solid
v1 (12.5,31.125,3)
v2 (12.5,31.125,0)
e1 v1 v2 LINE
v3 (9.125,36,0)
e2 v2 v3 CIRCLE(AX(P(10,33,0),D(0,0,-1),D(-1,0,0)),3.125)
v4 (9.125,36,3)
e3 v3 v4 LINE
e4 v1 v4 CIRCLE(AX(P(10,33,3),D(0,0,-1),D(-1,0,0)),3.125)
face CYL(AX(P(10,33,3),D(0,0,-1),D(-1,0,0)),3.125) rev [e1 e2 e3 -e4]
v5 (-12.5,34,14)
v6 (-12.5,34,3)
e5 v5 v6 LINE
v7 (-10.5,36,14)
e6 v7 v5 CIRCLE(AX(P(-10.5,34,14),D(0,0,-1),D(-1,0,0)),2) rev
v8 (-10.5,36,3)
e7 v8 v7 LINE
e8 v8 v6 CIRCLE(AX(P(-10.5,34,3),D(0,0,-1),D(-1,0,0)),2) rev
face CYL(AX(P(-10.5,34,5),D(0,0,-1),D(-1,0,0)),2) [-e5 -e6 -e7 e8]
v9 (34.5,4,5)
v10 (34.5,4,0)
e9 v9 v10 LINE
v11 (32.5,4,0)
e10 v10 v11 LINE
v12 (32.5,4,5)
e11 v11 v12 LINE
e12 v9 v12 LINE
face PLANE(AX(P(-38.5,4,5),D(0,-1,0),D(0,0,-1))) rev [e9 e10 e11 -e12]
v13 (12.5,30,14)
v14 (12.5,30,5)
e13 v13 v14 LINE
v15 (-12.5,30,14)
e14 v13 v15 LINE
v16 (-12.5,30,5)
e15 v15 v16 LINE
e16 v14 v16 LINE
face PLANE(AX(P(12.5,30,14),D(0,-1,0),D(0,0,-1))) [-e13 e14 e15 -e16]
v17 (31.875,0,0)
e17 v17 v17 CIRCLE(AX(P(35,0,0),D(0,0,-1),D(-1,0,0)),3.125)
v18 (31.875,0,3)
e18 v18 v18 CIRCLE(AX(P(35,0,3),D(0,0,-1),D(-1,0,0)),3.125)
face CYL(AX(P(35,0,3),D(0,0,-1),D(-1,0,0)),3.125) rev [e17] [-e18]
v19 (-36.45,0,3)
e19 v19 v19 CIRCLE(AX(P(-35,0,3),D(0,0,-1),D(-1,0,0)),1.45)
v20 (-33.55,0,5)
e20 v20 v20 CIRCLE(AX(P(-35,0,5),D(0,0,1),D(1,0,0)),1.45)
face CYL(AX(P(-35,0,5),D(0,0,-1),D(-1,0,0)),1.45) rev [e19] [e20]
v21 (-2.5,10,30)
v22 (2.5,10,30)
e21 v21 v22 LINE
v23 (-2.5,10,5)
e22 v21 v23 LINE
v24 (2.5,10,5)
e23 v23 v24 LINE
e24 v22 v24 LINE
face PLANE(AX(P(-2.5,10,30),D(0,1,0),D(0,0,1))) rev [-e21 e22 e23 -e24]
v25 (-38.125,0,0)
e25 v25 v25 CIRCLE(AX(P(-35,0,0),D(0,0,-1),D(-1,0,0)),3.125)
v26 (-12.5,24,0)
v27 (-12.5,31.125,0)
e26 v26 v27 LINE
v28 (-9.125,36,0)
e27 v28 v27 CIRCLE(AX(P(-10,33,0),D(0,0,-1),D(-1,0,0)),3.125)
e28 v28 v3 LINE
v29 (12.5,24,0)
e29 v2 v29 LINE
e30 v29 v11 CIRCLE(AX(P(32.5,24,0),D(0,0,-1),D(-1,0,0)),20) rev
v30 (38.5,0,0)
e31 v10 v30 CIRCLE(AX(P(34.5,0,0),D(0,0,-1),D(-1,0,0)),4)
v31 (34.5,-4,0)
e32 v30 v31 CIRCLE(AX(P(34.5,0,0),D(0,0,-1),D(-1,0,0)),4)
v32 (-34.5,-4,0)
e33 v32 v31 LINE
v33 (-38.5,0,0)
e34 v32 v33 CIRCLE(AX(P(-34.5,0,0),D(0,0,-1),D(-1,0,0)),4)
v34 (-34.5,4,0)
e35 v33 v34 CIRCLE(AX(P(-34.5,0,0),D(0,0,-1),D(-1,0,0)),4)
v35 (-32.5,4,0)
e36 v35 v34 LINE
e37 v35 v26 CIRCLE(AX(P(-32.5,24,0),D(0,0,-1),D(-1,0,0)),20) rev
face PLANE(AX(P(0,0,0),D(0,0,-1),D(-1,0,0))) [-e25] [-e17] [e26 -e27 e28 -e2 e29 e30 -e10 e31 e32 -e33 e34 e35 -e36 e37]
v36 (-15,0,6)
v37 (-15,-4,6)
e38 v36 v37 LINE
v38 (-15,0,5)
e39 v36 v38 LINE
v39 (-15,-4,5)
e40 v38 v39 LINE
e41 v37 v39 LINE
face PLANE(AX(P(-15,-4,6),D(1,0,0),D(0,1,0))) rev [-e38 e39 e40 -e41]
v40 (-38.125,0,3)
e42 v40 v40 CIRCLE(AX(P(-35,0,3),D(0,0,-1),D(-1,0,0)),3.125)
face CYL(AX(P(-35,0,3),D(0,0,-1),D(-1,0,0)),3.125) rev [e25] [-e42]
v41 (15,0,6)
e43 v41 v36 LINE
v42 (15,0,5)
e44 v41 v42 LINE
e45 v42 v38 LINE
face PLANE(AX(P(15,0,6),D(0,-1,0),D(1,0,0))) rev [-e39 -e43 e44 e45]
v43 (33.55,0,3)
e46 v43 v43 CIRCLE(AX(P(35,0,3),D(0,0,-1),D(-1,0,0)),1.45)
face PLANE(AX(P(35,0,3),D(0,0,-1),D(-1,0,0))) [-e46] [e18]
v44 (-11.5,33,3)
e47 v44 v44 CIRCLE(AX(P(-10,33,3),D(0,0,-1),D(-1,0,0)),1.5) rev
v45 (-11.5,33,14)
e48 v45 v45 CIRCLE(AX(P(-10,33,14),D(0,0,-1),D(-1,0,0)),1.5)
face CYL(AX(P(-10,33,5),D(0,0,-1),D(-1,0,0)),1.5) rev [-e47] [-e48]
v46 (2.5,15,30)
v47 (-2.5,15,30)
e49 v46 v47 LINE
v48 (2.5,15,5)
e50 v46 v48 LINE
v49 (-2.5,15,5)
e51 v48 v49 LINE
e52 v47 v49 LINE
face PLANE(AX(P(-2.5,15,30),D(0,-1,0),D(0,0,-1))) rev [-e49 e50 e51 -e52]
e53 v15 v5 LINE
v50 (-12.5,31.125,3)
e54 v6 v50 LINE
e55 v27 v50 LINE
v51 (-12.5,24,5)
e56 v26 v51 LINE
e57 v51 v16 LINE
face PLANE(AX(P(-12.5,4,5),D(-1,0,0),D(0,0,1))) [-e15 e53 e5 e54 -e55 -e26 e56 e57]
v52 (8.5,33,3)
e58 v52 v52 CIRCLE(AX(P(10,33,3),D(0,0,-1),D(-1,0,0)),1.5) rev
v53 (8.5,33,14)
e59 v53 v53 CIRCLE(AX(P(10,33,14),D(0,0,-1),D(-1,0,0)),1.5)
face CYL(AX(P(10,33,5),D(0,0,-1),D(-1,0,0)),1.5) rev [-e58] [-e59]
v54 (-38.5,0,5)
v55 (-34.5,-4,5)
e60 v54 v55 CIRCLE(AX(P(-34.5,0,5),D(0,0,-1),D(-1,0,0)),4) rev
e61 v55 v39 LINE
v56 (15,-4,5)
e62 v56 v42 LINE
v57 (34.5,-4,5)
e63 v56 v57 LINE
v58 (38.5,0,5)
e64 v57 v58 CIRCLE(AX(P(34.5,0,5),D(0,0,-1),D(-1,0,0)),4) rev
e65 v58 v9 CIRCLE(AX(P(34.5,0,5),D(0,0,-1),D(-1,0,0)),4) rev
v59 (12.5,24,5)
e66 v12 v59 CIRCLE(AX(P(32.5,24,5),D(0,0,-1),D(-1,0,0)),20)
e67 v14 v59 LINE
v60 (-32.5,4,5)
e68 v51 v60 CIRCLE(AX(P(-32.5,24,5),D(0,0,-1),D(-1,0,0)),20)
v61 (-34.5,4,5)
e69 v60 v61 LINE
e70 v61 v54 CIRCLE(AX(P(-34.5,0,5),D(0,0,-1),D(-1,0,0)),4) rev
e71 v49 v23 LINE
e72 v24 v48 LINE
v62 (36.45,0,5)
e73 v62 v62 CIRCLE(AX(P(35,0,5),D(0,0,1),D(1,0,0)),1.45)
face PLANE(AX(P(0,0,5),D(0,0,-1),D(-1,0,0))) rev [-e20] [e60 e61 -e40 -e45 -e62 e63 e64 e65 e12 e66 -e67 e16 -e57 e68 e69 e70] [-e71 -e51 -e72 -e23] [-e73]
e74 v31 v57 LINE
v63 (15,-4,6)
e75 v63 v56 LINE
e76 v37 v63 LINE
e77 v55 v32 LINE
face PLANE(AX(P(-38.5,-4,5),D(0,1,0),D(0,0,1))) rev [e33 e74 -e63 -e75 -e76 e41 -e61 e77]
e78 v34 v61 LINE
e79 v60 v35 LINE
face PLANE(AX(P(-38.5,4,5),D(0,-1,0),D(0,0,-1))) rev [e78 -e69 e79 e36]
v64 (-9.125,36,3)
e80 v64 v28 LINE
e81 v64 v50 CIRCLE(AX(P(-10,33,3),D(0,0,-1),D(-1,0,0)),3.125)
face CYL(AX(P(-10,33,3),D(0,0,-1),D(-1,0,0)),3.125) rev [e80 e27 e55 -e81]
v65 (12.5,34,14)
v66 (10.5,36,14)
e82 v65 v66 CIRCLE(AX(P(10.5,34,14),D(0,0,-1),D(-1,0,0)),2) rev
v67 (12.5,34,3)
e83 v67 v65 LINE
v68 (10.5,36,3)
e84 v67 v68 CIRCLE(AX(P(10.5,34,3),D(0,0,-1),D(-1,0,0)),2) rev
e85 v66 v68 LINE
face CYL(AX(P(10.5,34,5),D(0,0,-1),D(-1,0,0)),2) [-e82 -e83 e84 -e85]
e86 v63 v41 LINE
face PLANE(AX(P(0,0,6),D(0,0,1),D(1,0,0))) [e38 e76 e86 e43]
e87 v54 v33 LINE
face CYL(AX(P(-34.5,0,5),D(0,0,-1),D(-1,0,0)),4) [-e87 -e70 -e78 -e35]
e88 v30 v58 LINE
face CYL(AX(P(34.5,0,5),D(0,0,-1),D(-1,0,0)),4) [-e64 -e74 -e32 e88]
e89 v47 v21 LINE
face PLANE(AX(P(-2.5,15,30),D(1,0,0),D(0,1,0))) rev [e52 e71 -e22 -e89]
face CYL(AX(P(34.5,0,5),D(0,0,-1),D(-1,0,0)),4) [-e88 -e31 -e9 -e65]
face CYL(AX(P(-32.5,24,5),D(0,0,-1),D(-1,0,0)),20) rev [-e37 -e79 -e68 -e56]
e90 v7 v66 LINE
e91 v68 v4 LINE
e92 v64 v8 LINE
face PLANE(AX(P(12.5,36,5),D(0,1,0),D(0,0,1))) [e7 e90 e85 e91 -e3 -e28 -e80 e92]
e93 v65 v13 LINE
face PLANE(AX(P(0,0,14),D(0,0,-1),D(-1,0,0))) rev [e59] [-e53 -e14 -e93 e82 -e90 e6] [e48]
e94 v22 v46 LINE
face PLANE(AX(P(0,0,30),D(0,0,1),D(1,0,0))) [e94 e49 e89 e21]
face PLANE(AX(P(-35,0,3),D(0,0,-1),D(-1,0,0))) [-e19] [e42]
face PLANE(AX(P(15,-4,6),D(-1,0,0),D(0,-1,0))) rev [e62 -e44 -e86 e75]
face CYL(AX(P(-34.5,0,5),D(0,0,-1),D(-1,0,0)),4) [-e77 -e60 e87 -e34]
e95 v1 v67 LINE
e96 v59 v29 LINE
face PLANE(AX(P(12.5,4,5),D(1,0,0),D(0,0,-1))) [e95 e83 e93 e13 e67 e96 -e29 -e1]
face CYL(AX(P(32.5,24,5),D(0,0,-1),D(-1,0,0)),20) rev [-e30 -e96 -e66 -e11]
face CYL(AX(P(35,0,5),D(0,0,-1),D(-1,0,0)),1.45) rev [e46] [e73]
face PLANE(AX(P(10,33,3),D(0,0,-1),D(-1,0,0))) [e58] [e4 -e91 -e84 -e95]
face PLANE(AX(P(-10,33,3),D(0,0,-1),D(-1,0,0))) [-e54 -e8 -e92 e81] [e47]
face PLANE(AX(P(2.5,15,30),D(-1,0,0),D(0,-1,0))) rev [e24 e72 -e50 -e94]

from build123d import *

# Parameters (mm, degrees)
SKETCH_1_W          = 77
SKETCH_1_H          = 8
SKETCH_1_R          = 1.45
EXTRUDE_1_DEPTH     = 5
SKETCH_2_W          = 25
SKETCH_2_H          = 32
SKETCH_2_R          = 1.5
EXTRUDE_2_DEPTH     = 5
SKETCH_3_W          = 25
SKETCH_3_H          = 6
SKETCH_3_R          = 1.5
EXTRUDE_3_DEPTH     = 9
FILLET_1_R          = 20
FILLET_2_R          = 4
FILLET_3_R          = 2
SKETCH_4_R          = 3.125
CUT_EXTRUDE_3_DEPTH = 3
SKETCH_5_W          = 30
SKETCH_5_H          = 4
EXTRUDE_4_DEPTH     = 1
SKETCH_6_W          = 5
SKETCH_6_H          = 5
EXTRUDE_5_DEPTH     = 25


with BuildPart() as part:
    # Эскиз1 → Бобышка-Вытянуть1 (new body)
    with BuildSketch(Plane.XY):
        Rectangle(SKETCH_1_W, SKETCH_1_H)
        with Locations((-35, 0)):
            Circle(SKETCH_1_R, mode=Mode.SUBTRACT)
        with Locations((35, 0)):
            Circle(SKETCH_1_R, mode=Mode.SUBTRACT)
    extrude(amount=EXTRUDE_1_DEPTH)

    # Эскиз2 → Бобышка-Вытянуть2 (add)
    with BuildSketch(Plane(origin=(0, 0, 0), x_dir=(-1, 0, 0), z_dir=(0, 0, -1))):
        with Locations((0, 20)):
            Rectangle(SKETCH_2_W, SKETCH_2_H)
        with Locations((-10, 33)):
            Circle(SKETCH_2_R, mode=Mode.SUBTRACT)
        with Locations((10, 33)):
            Circle(SKETCH_2_R, mode=Mode.SUBTRACT)
    extrude(amount=-EXTRUDE_2_DEPTH)

    # Эскиз3 → Бобышка-Вытянуть3 (add)
    with BuildSketch(Plane(origin=(0, 0, 5), x_dir=(-1, 0, 0), z_dir=(0, 0, -1))):
        with Locations((0, 33)):
            Rectangle(SKETCH_3_W, SKETCH_3_H)
        with Locations((10, 33)):
            Circle(SKETCH_3_R, mode=Mode.SUBTRACT)
        with Locations((-10, 33)):
            Circle(SKETCH_3_R, mode=Mode.SUBTRACT)
    extrude(amount=-EXTRUDE_3_DEPTH)

    # Скругление1
    fillet_1_edges = [part.edges().sort_by_distance(p)[0] for p in [
        (12.5, 4, 2.5),
        (-12.5, 4, 2.5),
    ]]
    fillet(fillet_1_edges, radius=FILLET_1_R)

    # Скругление2
    fillet_2_edges = [part.edges().sort_by_distance(p)[0] for p in [
        (-38.5, -4, 2.5),
        (-38.5, 4, 2.5),
        (38.5, -4, 2.5),
        (38.5, 4, 2.5),
    ]]
    fillet(fillet_2_edges, radius=FILLET_2_R - 0.0001)  # a hair under: the kernel refuses the full size

    # Скругление3
    fillet_3_edges = [part.edges().sort_by_distance(p)[0] for p in [
        (12.5, 36, 7),
        (-12.5, 36, 7),
    ]]
    fillet(fillet_3_edges, radius=FILLET_3_R)

    # Эскиз4 → Вырез-Вытянуть3 (cut)
    with BuildSketch(Plane(origin=(0, 0, 0), x_dir=(-1, 0, 0), z_dir=(0, 0, -1))):
        with Locations((-10, 33)):
            Circle(SKETCH_4_R)
        with Locations((10, 33)):
            Circle(SKETCH_4_R)
        with Locations((-35, 0)):
            Circle(SKETCH_4_R)
        with Locations((35, 0)):
            Circle(SKETCH_4_R)
    extrude(amount=-CUT_EXTRUDE_3_DEPTH, mode=Mode.SUBTRACT)

    # Эскиз5 → Бобышка-Вытянуть4 (add)
    with BuildSketch(Plane.XY.offset(5)):
        with Locations((0, -2)):
            Rectangle(SKETCH_5_W, SKETCH_5_H)
    extrude(amount=EXTRUDE_4_DEPTH)

    # Эскиз6 → Бобышка-Вытянуть5 (add)
    with BuildSketch(Plane.XY.offset(5)):
        with Locations((0, 12.5)):
            Rectangle(SKETCH_6_W, SKETCH_6_H)
    extrude(amount=EXTRUDE_5_DEPTH)


solid = part.part
